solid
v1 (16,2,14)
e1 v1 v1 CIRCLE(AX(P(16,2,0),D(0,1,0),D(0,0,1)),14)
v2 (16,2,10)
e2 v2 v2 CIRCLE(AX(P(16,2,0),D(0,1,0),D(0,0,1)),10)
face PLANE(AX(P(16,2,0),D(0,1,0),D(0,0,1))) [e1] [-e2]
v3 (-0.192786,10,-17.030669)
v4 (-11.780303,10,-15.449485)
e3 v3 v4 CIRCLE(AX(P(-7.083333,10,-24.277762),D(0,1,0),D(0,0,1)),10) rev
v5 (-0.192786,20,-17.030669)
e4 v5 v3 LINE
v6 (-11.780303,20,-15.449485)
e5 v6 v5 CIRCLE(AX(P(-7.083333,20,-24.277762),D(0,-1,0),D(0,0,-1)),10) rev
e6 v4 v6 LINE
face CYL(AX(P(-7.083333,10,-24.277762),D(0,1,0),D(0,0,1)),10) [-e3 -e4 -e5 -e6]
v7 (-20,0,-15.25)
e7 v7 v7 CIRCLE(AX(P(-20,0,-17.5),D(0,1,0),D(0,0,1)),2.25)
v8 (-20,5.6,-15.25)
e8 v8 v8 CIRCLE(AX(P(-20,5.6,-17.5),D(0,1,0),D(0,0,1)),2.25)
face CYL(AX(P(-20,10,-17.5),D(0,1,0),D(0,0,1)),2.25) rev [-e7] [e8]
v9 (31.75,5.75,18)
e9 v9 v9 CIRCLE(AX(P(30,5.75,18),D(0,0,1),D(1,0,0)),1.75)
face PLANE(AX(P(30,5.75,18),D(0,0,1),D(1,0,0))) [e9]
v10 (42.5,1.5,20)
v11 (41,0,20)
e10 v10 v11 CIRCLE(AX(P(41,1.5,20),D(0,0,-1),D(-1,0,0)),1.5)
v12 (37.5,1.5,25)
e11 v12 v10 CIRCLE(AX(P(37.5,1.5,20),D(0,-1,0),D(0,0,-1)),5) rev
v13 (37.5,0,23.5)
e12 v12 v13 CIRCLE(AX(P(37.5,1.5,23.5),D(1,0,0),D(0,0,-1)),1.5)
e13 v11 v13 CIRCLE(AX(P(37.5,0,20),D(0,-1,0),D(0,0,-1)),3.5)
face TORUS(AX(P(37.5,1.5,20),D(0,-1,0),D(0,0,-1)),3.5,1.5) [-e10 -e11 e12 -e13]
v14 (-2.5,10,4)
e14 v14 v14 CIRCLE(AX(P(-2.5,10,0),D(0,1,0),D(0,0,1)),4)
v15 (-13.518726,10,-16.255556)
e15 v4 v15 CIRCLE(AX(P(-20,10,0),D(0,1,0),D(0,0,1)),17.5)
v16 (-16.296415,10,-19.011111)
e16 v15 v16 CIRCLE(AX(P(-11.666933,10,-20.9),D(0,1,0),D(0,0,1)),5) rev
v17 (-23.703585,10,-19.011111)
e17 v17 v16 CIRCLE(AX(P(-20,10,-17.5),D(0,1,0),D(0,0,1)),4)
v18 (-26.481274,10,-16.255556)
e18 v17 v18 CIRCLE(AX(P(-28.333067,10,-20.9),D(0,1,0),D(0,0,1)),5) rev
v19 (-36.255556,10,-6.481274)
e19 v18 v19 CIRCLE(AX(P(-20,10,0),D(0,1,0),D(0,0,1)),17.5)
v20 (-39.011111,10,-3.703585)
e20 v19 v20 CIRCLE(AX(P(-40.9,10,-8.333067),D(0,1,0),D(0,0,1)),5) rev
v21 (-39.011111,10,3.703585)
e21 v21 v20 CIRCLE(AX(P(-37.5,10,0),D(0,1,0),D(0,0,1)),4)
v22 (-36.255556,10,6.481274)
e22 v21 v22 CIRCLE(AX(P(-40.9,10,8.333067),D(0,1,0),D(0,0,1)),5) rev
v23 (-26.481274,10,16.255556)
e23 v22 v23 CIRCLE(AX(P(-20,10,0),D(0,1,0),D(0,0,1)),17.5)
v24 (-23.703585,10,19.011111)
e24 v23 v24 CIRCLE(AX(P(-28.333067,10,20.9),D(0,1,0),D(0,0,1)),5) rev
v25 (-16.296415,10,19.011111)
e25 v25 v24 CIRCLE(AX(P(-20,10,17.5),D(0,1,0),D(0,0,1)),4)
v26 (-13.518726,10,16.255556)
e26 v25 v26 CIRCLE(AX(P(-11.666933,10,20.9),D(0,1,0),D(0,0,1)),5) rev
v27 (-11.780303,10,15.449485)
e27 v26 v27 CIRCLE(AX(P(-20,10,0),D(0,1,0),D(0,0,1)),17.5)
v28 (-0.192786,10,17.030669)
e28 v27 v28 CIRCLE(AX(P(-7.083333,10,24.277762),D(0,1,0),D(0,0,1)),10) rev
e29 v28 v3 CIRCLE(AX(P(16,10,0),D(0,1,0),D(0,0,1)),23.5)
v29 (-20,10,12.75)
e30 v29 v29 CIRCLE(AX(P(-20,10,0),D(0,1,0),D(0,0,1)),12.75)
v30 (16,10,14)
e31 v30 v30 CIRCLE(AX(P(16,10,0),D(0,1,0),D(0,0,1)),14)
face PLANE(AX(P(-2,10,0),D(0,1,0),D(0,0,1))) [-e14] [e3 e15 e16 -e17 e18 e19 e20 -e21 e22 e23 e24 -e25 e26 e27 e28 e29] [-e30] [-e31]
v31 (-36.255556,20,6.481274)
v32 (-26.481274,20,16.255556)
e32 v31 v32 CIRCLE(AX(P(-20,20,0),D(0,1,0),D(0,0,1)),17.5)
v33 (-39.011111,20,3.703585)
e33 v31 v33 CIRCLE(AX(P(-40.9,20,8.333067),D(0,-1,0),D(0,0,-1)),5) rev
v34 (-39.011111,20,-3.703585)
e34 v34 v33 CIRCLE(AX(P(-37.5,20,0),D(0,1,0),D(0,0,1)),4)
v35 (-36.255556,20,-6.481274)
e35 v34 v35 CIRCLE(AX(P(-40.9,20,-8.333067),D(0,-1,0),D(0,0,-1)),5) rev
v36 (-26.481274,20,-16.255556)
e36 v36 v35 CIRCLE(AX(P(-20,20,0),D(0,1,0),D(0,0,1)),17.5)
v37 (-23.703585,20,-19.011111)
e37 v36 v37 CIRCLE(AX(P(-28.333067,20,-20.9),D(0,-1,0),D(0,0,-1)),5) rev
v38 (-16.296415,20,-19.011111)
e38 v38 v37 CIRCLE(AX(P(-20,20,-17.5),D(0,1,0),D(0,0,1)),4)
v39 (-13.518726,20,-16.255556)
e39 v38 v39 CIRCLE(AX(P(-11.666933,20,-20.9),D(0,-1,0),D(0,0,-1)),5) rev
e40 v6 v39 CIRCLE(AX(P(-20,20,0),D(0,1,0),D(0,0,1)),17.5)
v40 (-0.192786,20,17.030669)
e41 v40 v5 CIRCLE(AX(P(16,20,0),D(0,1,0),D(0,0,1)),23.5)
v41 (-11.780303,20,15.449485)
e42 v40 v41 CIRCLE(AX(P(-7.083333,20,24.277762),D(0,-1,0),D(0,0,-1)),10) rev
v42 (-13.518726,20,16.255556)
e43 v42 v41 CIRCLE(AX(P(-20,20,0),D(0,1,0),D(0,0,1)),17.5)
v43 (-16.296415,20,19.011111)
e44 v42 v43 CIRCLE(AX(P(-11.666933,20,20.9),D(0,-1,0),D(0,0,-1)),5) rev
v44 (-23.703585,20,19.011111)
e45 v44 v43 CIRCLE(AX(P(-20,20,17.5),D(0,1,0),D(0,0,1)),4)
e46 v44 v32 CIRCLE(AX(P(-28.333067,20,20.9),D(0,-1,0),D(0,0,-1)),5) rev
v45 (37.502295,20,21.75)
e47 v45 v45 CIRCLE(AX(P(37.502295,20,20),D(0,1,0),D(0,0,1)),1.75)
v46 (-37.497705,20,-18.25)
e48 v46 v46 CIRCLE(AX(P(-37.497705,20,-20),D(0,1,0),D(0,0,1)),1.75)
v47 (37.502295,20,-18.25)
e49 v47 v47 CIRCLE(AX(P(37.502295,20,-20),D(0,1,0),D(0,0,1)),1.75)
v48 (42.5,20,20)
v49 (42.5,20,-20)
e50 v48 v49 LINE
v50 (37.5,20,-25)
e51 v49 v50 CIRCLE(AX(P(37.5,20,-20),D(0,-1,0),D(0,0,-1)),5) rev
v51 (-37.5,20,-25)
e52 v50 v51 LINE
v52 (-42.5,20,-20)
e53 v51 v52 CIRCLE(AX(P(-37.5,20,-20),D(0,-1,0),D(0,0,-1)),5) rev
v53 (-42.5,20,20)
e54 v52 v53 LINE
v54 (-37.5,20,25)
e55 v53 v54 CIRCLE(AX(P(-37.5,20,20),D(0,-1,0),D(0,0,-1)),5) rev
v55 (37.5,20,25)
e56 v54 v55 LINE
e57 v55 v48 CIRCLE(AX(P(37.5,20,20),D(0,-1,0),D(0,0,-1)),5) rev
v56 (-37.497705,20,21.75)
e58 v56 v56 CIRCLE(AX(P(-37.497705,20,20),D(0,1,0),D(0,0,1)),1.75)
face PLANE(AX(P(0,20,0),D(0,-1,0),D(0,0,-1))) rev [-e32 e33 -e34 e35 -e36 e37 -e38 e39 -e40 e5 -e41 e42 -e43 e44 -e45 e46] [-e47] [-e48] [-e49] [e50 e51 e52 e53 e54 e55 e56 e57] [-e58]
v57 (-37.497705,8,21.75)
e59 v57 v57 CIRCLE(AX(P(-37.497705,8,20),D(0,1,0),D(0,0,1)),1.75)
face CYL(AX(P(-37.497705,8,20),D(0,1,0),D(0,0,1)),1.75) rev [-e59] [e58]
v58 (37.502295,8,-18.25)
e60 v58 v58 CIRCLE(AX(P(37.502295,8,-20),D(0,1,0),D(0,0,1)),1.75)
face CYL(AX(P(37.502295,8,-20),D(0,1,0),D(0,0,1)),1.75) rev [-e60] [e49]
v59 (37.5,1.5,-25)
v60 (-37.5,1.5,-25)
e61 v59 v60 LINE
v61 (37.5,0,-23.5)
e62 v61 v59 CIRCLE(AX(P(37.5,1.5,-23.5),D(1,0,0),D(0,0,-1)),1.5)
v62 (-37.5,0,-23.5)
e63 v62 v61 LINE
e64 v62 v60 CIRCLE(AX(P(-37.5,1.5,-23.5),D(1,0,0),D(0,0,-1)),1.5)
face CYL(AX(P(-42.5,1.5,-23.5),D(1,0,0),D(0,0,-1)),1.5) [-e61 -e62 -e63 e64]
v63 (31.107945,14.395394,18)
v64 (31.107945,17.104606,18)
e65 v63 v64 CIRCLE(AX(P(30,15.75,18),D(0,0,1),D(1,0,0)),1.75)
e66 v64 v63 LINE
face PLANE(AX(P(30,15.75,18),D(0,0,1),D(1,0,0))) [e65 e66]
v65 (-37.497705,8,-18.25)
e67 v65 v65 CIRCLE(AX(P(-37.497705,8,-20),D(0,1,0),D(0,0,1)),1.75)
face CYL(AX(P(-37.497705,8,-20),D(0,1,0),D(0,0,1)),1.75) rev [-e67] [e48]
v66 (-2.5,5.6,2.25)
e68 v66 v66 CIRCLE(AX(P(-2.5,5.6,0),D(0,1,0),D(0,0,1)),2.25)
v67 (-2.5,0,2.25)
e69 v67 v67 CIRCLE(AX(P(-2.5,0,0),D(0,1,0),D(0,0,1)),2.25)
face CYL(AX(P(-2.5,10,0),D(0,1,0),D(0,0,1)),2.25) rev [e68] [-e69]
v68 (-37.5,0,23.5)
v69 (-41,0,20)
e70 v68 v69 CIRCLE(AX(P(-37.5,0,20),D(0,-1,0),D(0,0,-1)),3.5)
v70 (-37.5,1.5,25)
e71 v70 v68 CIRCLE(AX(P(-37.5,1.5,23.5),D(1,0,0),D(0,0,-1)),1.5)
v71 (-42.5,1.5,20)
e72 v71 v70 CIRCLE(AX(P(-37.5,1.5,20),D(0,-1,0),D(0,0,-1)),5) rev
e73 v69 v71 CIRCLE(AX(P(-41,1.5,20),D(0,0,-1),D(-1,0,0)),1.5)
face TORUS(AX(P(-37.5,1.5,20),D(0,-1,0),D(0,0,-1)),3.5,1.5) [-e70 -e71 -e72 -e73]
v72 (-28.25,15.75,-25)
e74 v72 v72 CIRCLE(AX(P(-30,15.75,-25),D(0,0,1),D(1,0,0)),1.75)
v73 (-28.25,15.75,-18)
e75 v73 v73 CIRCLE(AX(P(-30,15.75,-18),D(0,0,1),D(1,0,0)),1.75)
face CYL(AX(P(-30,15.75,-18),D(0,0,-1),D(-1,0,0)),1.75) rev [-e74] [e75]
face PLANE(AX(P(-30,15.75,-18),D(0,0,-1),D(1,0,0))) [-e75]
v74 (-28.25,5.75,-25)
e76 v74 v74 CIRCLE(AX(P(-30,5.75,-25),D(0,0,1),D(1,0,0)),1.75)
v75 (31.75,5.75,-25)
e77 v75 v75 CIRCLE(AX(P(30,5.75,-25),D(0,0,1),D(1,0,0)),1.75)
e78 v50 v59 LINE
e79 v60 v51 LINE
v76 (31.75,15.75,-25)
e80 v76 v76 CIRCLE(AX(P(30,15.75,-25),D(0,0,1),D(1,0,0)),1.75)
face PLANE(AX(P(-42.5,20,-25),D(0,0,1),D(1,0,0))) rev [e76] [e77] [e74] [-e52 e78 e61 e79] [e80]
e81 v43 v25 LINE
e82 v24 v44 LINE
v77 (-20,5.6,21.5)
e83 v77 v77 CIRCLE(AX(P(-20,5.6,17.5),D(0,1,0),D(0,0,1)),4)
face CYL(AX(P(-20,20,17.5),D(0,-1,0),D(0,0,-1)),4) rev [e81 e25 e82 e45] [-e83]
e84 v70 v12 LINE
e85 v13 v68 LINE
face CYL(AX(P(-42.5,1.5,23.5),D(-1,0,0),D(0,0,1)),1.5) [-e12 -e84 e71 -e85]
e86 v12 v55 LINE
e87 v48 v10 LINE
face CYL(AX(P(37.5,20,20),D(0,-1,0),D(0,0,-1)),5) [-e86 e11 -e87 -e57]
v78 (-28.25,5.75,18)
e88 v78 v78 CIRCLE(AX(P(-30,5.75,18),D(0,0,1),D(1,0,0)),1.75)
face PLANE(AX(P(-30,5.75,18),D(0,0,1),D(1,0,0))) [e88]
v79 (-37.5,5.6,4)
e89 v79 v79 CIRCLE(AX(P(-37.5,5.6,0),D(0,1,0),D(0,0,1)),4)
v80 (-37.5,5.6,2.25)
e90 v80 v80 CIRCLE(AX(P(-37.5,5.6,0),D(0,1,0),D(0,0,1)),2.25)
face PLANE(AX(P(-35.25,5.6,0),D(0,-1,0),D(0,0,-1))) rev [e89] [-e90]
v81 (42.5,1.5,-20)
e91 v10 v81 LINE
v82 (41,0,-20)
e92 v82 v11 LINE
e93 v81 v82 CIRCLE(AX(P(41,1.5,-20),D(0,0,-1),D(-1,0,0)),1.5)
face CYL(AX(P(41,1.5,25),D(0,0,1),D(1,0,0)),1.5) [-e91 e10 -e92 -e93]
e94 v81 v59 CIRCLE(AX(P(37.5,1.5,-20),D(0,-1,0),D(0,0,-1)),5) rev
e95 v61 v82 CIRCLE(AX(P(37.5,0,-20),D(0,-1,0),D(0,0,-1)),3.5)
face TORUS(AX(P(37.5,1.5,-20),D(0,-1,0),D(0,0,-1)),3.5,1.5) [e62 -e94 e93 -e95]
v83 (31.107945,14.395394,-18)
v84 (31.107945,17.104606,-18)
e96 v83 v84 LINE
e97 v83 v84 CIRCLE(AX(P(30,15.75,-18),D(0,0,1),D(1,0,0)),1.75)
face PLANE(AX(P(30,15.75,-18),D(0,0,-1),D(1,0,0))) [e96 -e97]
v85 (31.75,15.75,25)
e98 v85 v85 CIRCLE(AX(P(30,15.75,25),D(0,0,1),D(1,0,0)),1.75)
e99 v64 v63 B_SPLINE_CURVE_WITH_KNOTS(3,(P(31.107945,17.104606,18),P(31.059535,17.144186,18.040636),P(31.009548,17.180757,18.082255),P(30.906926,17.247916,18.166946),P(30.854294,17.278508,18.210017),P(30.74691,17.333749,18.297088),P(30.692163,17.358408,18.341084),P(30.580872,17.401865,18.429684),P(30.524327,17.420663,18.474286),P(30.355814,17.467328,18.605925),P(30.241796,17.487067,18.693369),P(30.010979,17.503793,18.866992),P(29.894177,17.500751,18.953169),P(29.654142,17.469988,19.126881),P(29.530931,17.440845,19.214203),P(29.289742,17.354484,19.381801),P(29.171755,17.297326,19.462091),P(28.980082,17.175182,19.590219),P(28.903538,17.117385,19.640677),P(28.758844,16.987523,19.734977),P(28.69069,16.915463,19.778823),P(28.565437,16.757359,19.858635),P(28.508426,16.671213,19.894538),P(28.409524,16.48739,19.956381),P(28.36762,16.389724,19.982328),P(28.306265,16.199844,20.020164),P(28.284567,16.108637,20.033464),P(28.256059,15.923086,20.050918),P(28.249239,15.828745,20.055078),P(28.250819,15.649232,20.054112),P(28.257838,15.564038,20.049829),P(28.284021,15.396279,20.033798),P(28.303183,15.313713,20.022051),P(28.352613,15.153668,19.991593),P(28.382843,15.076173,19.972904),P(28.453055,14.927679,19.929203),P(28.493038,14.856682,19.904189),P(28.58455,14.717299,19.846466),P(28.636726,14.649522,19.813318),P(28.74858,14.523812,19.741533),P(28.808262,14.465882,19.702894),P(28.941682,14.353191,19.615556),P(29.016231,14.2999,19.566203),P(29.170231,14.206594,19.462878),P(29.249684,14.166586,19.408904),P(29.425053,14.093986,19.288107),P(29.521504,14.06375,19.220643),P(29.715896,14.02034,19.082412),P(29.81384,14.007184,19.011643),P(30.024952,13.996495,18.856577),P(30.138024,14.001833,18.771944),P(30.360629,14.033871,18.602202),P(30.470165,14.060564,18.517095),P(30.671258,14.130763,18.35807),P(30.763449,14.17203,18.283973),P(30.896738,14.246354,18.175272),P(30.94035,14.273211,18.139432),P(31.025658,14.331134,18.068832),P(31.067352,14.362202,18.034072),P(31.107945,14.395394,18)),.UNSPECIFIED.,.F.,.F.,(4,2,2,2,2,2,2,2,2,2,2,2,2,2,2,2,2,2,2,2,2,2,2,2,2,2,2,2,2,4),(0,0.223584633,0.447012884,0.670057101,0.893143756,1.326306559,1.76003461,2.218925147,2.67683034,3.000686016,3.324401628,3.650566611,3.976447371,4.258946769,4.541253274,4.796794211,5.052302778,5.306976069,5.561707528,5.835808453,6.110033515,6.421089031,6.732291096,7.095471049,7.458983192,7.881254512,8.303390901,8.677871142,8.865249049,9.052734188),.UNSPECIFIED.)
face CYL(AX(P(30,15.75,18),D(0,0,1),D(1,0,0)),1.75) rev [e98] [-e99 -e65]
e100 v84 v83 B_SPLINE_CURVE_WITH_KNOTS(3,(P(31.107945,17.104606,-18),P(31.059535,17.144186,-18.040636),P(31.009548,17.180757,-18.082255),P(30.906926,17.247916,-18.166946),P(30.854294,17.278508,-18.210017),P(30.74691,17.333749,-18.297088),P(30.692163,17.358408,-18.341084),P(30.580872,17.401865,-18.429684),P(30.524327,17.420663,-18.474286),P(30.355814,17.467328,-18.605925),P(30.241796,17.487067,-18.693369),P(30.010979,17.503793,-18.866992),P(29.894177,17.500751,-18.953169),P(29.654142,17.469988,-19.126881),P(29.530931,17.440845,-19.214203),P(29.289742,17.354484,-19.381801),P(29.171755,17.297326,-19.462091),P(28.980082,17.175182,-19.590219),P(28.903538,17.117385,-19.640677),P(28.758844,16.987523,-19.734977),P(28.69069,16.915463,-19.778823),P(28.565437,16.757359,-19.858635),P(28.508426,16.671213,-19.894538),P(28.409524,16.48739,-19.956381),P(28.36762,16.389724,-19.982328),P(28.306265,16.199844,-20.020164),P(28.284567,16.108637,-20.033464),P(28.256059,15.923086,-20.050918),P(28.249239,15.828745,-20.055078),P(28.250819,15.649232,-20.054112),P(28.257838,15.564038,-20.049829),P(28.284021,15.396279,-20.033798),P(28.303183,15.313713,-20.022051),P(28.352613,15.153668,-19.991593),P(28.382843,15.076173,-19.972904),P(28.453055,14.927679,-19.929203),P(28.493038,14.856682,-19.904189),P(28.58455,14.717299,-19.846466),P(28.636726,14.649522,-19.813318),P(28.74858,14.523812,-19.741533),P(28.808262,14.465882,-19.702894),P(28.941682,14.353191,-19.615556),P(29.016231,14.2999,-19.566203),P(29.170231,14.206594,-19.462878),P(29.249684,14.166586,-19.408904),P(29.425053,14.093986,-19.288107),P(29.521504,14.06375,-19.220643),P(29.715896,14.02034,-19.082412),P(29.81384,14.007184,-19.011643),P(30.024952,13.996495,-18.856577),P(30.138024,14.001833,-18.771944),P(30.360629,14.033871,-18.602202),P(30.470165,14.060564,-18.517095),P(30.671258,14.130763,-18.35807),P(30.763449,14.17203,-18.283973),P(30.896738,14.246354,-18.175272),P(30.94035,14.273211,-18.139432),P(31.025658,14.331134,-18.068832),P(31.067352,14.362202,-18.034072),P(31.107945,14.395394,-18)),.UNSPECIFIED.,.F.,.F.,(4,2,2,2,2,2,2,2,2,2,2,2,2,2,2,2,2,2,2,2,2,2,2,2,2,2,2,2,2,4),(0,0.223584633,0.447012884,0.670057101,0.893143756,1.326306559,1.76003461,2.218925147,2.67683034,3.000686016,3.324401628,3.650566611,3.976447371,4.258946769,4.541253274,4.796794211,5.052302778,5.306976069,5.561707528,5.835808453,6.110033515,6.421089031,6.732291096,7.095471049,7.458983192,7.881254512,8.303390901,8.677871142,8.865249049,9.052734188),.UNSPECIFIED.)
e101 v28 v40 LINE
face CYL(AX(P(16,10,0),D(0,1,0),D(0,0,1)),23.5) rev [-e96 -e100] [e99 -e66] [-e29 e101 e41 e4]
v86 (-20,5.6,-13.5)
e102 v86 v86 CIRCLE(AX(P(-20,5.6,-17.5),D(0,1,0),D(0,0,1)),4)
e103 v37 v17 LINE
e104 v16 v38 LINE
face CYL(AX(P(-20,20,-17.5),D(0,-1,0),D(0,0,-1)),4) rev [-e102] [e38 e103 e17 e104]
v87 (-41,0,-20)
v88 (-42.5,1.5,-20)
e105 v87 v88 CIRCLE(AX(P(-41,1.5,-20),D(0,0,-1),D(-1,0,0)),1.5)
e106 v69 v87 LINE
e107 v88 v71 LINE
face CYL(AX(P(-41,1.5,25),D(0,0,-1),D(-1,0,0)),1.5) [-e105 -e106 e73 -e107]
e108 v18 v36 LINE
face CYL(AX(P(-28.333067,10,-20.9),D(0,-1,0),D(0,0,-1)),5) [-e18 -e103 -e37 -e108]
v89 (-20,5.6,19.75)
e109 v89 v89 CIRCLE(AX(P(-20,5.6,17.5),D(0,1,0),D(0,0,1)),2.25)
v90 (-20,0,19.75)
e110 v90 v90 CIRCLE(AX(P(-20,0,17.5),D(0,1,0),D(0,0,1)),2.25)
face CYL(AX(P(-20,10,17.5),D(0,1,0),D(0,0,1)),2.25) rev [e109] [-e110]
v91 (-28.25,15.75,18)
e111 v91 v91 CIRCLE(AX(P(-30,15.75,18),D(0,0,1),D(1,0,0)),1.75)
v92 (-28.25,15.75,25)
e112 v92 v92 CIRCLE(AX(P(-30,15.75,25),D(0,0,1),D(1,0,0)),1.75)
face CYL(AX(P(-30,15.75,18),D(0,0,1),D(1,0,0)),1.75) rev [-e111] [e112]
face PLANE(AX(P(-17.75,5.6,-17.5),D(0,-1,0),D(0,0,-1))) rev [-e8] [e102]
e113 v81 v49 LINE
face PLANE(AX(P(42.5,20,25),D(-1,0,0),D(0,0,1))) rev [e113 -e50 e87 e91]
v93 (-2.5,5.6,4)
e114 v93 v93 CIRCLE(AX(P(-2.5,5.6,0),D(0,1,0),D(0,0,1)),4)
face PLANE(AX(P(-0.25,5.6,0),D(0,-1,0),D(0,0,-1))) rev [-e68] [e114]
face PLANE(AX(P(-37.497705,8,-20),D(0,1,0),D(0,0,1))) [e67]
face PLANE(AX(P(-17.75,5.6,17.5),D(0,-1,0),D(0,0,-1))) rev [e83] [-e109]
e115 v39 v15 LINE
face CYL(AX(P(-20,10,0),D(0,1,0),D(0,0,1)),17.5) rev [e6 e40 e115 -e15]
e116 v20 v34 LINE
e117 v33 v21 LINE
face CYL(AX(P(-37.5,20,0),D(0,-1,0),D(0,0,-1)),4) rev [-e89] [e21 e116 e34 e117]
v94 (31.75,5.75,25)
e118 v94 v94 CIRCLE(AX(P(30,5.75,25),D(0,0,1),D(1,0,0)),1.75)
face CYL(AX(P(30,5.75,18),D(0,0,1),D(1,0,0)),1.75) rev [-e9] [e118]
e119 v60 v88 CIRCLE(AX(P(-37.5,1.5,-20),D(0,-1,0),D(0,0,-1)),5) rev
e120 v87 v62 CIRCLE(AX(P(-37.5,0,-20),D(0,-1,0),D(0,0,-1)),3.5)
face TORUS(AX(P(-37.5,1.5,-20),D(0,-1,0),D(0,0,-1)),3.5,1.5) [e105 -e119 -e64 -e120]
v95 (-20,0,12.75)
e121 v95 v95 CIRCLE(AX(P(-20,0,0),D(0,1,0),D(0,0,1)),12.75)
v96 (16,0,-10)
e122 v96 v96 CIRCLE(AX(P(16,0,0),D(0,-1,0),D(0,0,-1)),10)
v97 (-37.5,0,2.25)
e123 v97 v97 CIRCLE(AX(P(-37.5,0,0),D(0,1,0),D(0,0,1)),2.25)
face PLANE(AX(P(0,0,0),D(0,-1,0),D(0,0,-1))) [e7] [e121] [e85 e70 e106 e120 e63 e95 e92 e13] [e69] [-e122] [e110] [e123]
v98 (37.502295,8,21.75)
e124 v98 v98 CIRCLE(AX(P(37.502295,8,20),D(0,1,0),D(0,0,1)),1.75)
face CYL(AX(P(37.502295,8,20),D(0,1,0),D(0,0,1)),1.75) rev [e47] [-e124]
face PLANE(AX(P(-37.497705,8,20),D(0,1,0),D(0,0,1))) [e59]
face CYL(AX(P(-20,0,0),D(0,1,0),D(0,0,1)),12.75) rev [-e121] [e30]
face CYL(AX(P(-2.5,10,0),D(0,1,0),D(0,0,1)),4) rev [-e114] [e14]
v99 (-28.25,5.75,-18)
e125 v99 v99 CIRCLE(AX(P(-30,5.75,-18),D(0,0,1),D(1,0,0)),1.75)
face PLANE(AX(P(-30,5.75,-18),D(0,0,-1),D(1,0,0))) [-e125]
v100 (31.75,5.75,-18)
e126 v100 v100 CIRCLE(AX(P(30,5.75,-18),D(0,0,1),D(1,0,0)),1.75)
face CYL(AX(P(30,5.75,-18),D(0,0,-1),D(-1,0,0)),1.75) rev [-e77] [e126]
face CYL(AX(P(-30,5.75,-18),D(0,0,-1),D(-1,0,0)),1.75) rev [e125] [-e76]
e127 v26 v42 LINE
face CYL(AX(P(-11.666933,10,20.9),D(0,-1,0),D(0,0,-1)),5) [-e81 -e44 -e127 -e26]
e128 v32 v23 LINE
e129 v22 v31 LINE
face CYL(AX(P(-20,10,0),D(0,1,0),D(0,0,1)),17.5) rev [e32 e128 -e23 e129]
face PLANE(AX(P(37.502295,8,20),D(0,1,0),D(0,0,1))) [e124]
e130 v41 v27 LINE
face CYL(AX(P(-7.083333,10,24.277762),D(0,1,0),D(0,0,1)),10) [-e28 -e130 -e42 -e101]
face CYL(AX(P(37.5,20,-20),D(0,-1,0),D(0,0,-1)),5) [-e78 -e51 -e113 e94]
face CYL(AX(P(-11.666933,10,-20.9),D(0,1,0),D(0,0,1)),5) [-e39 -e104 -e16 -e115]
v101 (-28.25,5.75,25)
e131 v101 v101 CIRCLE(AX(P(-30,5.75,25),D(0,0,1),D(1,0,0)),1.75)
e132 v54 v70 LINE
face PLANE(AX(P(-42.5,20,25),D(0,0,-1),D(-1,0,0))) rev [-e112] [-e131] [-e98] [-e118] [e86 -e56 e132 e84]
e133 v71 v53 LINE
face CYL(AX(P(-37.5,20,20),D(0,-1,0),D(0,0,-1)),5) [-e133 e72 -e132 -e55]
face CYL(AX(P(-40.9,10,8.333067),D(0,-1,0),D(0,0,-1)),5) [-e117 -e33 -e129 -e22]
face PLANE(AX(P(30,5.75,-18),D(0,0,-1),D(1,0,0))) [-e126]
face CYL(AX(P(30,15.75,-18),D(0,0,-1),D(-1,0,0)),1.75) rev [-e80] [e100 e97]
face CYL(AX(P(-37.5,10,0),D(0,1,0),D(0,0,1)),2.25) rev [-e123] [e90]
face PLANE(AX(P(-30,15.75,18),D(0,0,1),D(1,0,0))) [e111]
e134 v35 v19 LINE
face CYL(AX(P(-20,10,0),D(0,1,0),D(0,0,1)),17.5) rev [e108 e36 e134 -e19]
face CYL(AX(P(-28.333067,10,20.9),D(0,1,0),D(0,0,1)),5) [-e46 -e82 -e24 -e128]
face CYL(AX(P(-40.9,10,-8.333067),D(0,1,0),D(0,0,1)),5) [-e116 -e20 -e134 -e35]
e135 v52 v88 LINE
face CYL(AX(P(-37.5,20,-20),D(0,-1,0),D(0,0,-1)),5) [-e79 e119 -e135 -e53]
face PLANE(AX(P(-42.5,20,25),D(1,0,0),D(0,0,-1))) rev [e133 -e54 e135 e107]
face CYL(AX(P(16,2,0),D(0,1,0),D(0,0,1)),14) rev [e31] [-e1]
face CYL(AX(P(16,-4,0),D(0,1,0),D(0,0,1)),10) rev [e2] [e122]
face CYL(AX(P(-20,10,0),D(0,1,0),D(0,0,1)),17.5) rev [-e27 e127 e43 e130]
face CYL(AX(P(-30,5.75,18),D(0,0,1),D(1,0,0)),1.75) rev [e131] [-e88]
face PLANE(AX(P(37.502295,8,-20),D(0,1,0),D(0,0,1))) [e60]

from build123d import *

# Parameters (mm, degrees)
SKETCH1_W                                           = 85
SKETCH1_H                                           = 50.00000000000001
BOSS_EXTRUDE1_DEPTH                                 = 20
CUT_EXTRUDE1_DEPTH                                  = 10
FILLET1_R                                           = 5
FILLET2_R                                           = 10
SKETCH3_R                                           = 12.75
CUT_EXTRUDE2_DEPTH                                  = 10
SKETCH13_R                                          = 3.999999999999999
SKETCH13_R_2                                        = 4.000000000000006
SKETCH13_R_3                                        = 4
CUT_EXTRUDE4_DEPTH                                  = 10
CBORE_FOR_M4_HEX_SOCKET_HEAD_CAP_SCREW2_D           = 4.5
CBORE_FOR_M4_HEX_SOCKET_HEAD_CAP_SCREW2_CBORE_D     = 8
CBORE_FOR_M4_HEX_SOCKET_HEAD_CAP_SCREW2_CBORE_DEPTH = 4.4
FILLET4_R                                           = 5
SKETCH17_R                                          = 14
CUT_EXTRUDE5_DEPTH                                  = 8
SKETCH18_R                                          = 10.000000000000002
CUT_EXTRUDE6_DEPTH                                  = 6
SKETCH19_R                                          = 1.7500000000000038
CUT_EXTRUDE7_DEPTH                                  = 12
FILLET5_R                                           = 1.5
SKETCH20_R                                          = 1.7500000000000004
SKETCH20_R_2                                        = 1.7500000000000002
SKETCH20_R_3                                        = 1.7500000000000038
SKETCH20_R_4                                        = 1.7500000000000036
CUT_EXTRUDE8_DEPTH                                  = 7


with BuildPart() as part:
    # Sketch1 → Boss-Extrude1 (new body)
    with BuildSketch(Plane(origin=(0, 0, 0), x_dir=(1, 0, 0), z_dir=(0, 1, 0))):
        Rectangle(SKETCH1_W, SKETCH1_H)
    extrude(amount=BOSS_EXTRUDE1_DEPTH)

    # Sketch2 → Cut-Extrude1 (cut)
    with BuildSketch(Plane(origin=(0, 20, 0), x_dir=(1, 0, 0), z_dir=(0, 1, 0))):
        with BuildLine():
            ThreePointArc((-5.41666666666668, 9.67348897186992), (-37.500000000000014, 2.14e-15), (-5.41666666666668, -9.67348897186992))
            ThreePointArc((-5.41666666666668, -9.67348897186992), (39.499999999999986, 0), (-5.41666666666668, 9.67348897186992))
        make_face()
    extrude(amount=-CUT_EXTRUDE1_DEPTH, mode=Mode.SUBTRACT)

    # Fillet1
    fillet1_edges = [part.edges().sort_by_distance(p)[0] for p in [
        (42.5, 10, 25),
        (-42.5, 10, 25),
        (-42.5, 10, -25),
        (42.5, 10, -25),
    ]]
    fillet(fillet1_edges, radius=FILLET1_R)

    # Fillet2
    fillet2_edges = [part.edges().sort_by_distance(p)[0] for p in [
        (-5.4166666666666785, 15, -9.673488971869928),
        (-5.416666666666677, 15, 9.673488971869919),
    ]]
    fillet(fillet2_edges, radius=FILLET2_R)

    # Sketch3 → Cut-Extrude2 (cut)
    with BuildSketch(Plane(origin=(0, 10, 0), x_dir=(1, 0, 0), z_dir=(0, 1, 0))):
        with Locations(Location((-20.00000000000001, 0, 0), (0, 0, 270))):
            Circle(SKETCH3_R)
    extrude(amount=-CUT_EXTRUDE2_DEPTH, mode=Mode.SUBTRACT)

    # Sketch13 → Cut-Extrude4 (cut)
    with BuildSketch(Plane(origin=(0, 10, 0), x_dir=(1, 0, 0), z_dir=(0, 1, 0))):
        with Locations((-20.00000000000001, 17.500000000000004)):
            Circle(SKETCH13_R)
        with Locations((-37.50000000000002, 0)):
            Circle(SKETCH13_R_2)
        with Locations((-20.00000000000001, -17.500000000000004)):
            Circle(SKETCH13_R)
        with Locations((-2.5000000000000058, 0)):
            Circle(SKETCH13_R_3)
    extrude(amount=CUT_EXTRUDE4_DEPTH, mode=Mode.SUBTRACT)

    # CBORE for M4 Hex Socket Head Cap Screw2 (through all)
    with Locations(Plane(origin=(0, 10, 0), x_dir=(1, 0, 0), z_dir=(0, 1, 0))):
        with Locations((-20, 17.5), (-37.5, 0), (-20, -17.5), (-2.5, 0)):
            CounterBoreHole(CBORE_FOR_M4_HEX_SOCKET_HEAD_CAP_SCREW2_D / 2, CBORE_FOR_M4_HEX_SOCKET_HEAD_CAP_SCREW2_CBORE_D / 2, CBORE_FOR_M4_HEX_SOCKET_HEAD_CAP_SCREW2_CBORE_DEPTH)

    # Fillet4
    # the kernel refuses this fillet: 5 mm, written as the material it takes off along each edge
    with BuildSketch(Plane(origin=(-23.973791691591714, 10, -17.042857142857144), x_dir=(-0.954076861711662, 0, 0.2995619167157709), z_dir=(0, 1, 0))) as fillet4_piece_1:
        with BuildLine():
            CenterArc((3.0036302761545866, -4.985883518062786), FILLET4_R, 94.30643699703337, 46.066169411844314)
            ThreePointArc((-0.847411708769257, -1.796921989546989), (-0.3103690050239528, -0.9519095995220337), (0, 0))
            ThreePointArc((0, 0), (1.3140882458176382, -0.04940768678026136), (2.6281764916352697, 5e-17))
        make_face()
    extrude(amount=16.570441229088175, mode=Mode.SUBTRACT)
    with BuildSketch(Plane(origin=(-16.026208308408307, 10, -17.042857142857148), x_dir=(0.9540768617116616, 0, 0.2995619167157718), z_dir=(0, 1, 0))) as fillet4_piece_2:
        with BuildLine():
            CenterArc((3.0036302761545857, 4.985883518062786), FILLET4_R, 219.62739359112237, 46.06616941184433)
            ThreePointArc((-0.8474117087692576, 1.7969219895469846), (-0.31036900502395265, 0.95190959952203), (0, 0))
            ThreePointArc((0, 0), (1.3140882458176364, 0.04940768678026209), (2.628176491635274, 4e-17))
        make_face()
    extrude(amount=16.570441229088186, mode=Mode.SUBTRACT)
    with BuildSketch(Plane(origin=(-37.04285714285715, 10, 3.973791691591705), x_dir=(0.29956191671576937, 0, 0.9540768617116623), z_dir=(0, 1, 0))) as fillet4_piece_3:
        with BuildLine():
            CenterArc((3.0036302761546088, -4.985883518062785), FILLET4_R, 94.30643699703347, 46.06616941184433)
            ThreePointArc((-0.8474117087692441, -1.7969219895469968), (-0.3103690050239449, -0.9519095995220361), (0, 0))
            ThreePointArc((0, 0), (1.3140882458176406, -0.04940768678026007), (2.628176491635283, 2e-17))
        make_face()
    extrude(amount=16.57044122908821, mode=Mode.SUBTRACT)
    with BuildSketch(Plane(origin=(-37.04285714285716, 10, -3.9737916915917033), x_dir=(-0.9907079173697112, 0, 0.13600670005911286), z_dir=(0, 1, 0))) as fillet4_piece_4:
        with BuildLine():
            CenterArc((3.2284113635675427, -4.843365499227848), FILLET4_R, 104.37926436272748, 46.066169411844285)
            ThreePointArc((-1.1210203197438697, -2.377104354862376), (-0.51582243521462, -1.2096264930292784), (0, 0))
            ThreePointArc((0, 0), (0.9933573426361664, -0.12530760061772306), (1.986714685272327, 0))
        make_face()
    extrude(amount=16.570441229088196, mode=Mode.SUBTRACT)
    with BuildSketch(Plane(origin=(-16.026208308408307, 10, 17.042857142857144), x_dir=(0.9540768617116622, 0, -0.29956191671577), z_dir=(0, 1, 0))) as fillet4_piece_5:
        with BuildLine():
            CenterArc((3.003630276154599, -4.985883518062785), FILLET4_R, 94.30643699703343, 46.06616941184434)
            ThreePointArc((-0.8474117087692495, -1.7969219895469952), (-0.31036900502395187, -0.9519095995220339), (0, 0))
            ThreePointArc((0, 0), (1.314088245817627, -0.04940768678026029), (2.6281764916352777, 1e-17))
        make_face()
    extrude(amount=16.570441229088196, mode=Mode.SUBTRACT)
    with BuildSketch(Plane(origin=(-23.97379169159171, 10, 17.042857142857144), x_dir=(0.1360067000591155, 0, 0.9907079173697108), z_dir=(0, 1, 0))) as fillet4_piece_6:
        with BuildLine():
            CenterArc((3.2284113635675378, -4.843365499227849), FILLET4_R, 104.37926436272741, 46.06616941184424)
            ThreePointArc((-1.1210203197438684, -2.37710435486237), (-0.5158224352146136, -1.2096264930292846), (0, 0))
            ThreePointArc((0, 0), (0.9933573426361628, -0.12530760061772173), (1.9867146852723276, -3e-17))
        make_face()
    extrude(amount=16.570441229088182, mode=Mode.SUBTRACT)

    # Sketch17 → Cut-Extrude5 (cut)
    with BuildSketch(Plane(origin=(0, 10, 0), x_dir=(1, 0, 0), z_dir=(0, 1, 0))):
        with Locations(Location((15.999999999999986, 0, 0), (0, 0, 270))):
            Circle(SKETCH17_R)
    extrude(amount=-CUT_EXTRUDE5_DEPTH, mode=Mode.SUBTRACT)

    # Sketch18 → Cut-Extrude6 (cut)
    with BuildSketch(Plane(origin=(0, 2, 0), x_dir=(1, 0, 0), z_dir=(0, 1, 0))):
        with Locations(Location((15.999999999999986, 0, 0), (0, 0, 270))):
            Circle(SKETCH18_R)
    extrude(amount=-CUT_EXTRUDE6_DEPTH, mode=Mode.SUBTRACT)

    # Sketch19 → Cut-Extrude7 (cut)
    with BuildSketch(Plane(origin=(0, 20, 0), x_dir=(1, 0, 0), z_dir=(0, 1, 0))):
        with Locations(Location((-37.49770482679156, 19.999999999999996, 0), (0, 0, 270))):
            Circle(SKETCH19_R)
        with Locations(Location((37.50229517320846, 20, 0), (0, 0, 270))):
            Circle(SKETCH19_R)
        with Locations(Location((37.50229517320845, -20, 0), (0, 0, 270))):
            Circle(SKETCH19_R)
        with Locations(Location((-37.49770482679156, -20, 0), (0, 0, 270))):
            Circle(SKETCH19_R)
    extrude(amount=-CUT_EXTRUDE7_DEPTH, mode=Mode.SUBTRACT)

    # Fillet5
    fillet5_edges = [part.edges().sort_by_distance(p)[0] for p in [
        (42.5, 0, 0),
        (0, 0, 25),
        (-42.5, 0, 0),
        (0, 0, -25),
        (-41.03553390593274, 0, -23.535533905932738),
        (41.03553390593274, 0, -23.535533905932738),
        (-41.03553390593274, 0, 23.535533905932738),
        (41.03553390593274, 0, 23.535533905932738),
    ]]
    fillet(fillet5_edges, radius=FILLET5_R)

    # Sketch20 → Cut-Extrude8 (cut)
    with BuildSketch(Plane.XY.offset(25)):
        with Locations((-30, 15.75)):
            Circle(SKETCH20_R)
        with Locations((-30, 5.750000000000002)):
            Circle(SKETCH20_R_2)
        with Locations((30, 15.75)):
            Circle(SKETCH20_R_3)
        with Locations((30, 5.750000000000002)):
            Circle(SKETCH20_R_4)
    cut_extrude8 = extrude(amount=-CUT_EXTRUDE8_DEPTH, mode=Mode.SUBTRACT)

    # Mirror1: Cut-Extrude8 across plane
    add(cut_extrude8.mirror(Plane.XY), mode=Mode.SUBTRACT)


solid = part.part
